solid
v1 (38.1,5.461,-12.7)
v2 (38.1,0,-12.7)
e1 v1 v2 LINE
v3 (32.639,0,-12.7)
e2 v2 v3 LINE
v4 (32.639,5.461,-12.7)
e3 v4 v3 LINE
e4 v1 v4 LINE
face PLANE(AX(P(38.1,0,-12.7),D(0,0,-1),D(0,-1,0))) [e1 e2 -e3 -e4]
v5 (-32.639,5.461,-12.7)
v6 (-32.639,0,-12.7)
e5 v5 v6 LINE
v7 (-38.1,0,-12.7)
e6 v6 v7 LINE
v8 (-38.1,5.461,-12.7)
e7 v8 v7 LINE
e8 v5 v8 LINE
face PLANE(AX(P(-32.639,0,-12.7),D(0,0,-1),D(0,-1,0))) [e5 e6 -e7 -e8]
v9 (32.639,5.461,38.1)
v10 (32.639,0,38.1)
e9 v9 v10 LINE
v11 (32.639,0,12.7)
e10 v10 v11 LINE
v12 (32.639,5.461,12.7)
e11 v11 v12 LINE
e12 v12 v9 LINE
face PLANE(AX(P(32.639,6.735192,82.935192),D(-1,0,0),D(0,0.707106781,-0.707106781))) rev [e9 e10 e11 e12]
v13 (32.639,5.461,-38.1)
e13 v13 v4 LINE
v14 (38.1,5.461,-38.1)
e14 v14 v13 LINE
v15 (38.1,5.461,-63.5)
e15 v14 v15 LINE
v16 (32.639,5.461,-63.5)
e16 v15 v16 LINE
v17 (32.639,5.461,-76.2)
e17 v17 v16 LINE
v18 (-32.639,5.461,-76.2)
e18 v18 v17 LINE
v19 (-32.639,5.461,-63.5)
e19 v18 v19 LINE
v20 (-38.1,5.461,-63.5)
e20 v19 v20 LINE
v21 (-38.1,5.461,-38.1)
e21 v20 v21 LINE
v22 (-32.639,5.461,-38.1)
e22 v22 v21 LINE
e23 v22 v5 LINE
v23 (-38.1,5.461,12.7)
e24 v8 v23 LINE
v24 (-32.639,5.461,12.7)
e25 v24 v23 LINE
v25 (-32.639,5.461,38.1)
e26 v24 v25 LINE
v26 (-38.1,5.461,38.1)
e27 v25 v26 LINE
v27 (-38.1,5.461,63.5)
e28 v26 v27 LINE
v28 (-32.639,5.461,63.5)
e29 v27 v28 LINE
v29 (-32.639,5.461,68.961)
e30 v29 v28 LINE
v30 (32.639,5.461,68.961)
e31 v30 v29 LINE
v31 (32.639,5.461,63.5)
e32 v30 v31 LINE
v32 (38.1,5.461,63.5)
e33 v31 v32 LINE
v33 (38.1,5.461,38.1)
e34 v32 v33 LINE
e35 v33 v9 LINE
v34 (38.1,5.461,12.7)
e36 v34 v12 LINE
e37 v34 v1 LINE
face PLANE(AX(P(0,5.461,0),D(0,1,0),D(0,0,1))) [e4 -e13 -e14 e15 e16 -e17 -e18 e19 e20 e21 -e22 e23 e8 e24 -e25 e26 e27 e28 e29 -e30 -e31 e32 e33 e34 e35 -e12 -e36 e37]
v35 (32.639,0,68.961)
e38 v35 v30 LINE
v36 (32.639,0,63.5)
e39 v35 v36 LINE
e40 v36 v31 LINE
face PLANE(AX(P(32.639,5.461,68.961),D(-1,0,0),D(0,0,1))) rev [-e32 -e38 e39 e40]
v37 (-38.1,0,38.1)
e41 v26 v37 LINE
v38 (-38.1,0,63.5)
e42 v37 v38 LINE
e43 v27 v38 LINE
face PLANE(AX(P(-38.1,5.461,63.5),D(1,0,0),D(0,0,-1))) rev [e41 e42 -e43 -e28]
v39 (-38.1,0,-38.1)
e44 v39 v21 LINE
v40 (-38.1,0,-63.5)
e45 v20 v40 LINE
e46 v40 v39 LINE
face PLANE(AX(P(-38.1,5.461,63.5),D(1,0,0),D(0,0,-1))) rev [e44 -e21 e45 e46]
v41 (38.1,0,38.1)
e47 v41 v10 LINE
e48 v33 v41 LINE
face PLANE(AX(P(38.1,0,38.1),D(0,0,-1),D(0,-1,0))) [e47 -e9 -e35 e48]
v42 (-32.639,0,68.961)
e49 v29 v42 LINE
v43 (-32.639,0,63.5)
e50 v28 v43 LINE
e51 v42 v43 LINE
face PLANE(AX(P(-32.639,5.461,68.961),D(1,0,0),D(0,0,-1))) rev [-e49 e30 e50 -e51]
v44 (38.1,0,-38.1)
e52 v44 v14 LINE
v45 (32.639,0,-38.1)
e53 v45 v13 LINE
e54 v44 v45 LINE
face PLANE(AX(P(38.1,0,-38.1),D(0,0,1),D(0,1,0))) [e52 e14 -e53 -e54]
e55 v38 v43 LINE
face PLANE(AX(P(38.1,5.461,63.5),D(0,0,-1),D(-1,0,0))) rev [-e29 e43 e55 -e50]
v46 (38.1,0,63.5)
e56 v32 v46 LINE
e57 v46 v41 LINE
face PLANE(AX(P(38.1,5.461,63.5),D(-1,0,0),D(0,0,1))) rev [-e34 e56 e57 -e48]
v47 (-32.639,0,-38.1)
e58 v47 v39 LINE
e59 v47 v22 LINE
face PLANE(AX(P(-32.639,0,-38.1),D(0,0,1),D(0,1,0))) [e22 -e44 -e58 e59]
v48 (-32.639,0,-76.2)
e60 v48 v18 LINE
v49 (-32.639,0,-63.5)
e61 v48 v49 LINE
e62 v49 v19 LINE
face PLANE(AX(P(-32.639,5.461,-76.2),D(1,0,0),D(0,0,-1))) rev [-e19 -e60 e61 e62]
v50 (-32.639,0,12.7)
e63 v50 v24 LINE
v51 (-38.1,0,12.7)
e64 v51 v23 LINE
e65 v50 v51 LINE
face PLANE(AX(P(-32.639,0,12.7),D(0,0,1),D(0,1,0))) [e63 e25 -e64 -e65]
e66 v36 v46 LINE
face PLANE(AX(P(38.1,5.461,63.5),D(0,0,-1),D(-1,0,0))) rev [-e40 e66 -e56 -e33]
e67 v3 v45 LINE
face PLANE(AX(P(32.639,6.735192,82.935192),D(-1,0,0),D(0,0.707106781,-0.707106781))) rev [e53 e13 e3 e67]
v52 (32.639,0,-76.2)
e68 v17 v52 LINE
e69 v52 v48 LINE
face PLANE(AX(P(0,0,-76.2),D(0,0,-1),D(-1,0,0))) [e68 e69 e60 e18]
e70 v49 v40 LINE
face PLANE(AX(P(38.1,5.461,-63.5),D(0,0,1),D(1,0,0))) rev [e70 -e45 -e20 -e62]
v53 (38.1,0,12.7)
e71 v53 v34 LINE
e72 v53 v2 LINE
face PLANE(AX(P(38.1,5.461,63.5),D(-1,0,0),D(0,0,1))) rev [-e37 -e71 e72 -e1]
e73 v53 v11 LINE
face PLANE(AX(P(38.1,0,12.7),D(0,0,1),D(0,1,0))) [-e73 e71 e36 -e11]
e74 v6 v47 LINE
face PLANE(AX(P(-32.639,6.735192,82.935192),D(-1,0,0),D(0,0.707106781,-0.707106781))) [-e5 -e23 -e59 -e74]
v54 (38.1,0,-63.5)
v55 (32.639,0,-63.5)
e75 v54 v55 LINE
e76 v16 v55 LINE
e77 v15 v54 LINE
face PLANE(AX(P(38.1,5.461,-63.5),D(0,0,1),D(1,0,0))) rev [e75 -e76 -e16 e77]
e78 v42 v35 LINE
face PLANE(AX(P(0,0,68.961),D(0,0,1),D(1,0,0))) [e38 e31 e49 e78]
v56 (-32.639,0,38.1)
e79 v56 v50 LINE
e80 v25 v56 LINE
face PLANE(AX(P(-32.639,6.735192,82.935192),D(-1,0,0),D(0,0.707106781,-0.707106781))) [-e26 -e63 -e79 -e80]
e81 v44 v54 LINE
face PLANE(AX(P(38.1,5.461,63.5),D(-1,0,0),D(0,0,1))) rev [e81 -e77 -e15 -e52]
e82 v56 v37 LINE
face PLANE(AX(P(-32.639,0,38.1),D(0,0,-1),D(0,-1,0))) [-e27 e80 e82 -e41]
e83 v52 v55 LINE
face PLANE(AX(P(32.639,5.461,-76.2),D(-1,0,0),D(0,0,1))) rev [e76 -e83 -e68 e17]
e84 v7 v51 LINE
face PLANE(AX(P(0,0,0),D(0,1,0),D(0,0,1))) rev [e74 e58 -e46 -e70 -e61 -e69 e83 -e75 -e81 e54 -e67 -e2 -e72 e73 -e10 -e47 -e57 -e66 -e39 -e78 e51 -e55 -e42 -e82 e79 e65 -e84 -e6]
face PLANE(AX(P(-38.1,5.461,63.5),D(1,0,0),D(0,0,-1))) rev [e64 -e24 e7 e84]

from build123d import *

# Parameters (mm, degrees)
SKETCH1_W           = 76.2
SKETCH1_H           = 127
BOSS_EXTRUDE1_DEPTH = 5.461
CAVITY1_START       = -38.1
CAVITY1_OUTLINE_W   = 5.461
CAVITY1_OUTLINE_H   = 25.4
CAVITY1_DEPTH       = 5.461
CAVITY1_START_2     = 32.639
CAVITY1_2_OUTLINE_W = 5.461
CAVITY1_2_OUTLINE_H = 25.4
CAVITY1_2_DEPTH     = 5.461
SKETCH2_W           = 65.278
SKETCH2_H           = 5.461
BOSS_EXTRUDE2_DEPTH = 5.461
SKETCH3_W           = 65.278
SKETCH3_H           = 5.461
BOSS_EXTRUDE3_DEPTH = 12.7


# Read off the part's stored shape, not the designer's step: Cavity1
with BuildPart() as part:
    # Sketch1 → Boss-Extrude1 (new body)
    with BuildSketch(Plane(origin=(0, 0, 0), x_dir=(1, 0, 0), z_dir=(0, 1, 0))):
        Rectangle(SKETCH1_W, SKETCH1_H)
    extrude(amount=BOSS_EXTRUDE1_DEPTH)

    # Cavity1 outline → Cavity1 (cut)
    with BuildSketch(Plane.YZ.offset(CAVITY1_START)):
        with Locations((2.7305, 25.4)):
            Rectangle(CAVITY1_OUTLINE_W, CAVITY1_OUTLINE_H)
        with Locations((2.7305, -25.4)):
            Rectangle(CAVITY1_OUTLINE_W, CAVITY1_OUTLINE_H)
    extrude(amount=CAVITY1_DEPTH, mode=Mode.SUBTRACT)

    # Cavity1 2 outline → Cavity1 2 (cut)
    with BuildSketch(Plane.YZ.offset(CAVITY1_START_2)):
        with Locations((2.7305, 25.4)):
            Rectangle(CAVITY1_2_OUTLINE_W, CAVITY1_2_OUTLINE_H)
        with Locations((2.7305, -25.4)):
            Rectangle(CAVITY1_2_OUTLINE_W, CAVITY1_2_OUTLINE_H)
    extrude(amount=CAVITY1_2_DEPTH, mode=Mode.SUBTRACT)

    # Sketch2 → Boss-Extrude2 (add)
    with BuildSketch(Plane.XY.offset(63.5)):
        with Locations((0, 2.7305)):
            Rectangle(SKETCH2_W, SKETCH2_H)
    extrude(amount=BOSS_EXTRUDE2_DEPTH)

    # Sketch3 → Boss-Extrude3 (add)
    with BuildSketch(Plane(origin=(0, 0, -63.5), x_dir=(-1, 0, 0), z_dir=(0, 0, -1))):
        with Locations((0, 2.7305)):
            Rectangle(SKETCH3_W, SKETCH3_H)
    extrude(amount=BOSS_EXTRUDE3_DEPTH)


solid = part.part
